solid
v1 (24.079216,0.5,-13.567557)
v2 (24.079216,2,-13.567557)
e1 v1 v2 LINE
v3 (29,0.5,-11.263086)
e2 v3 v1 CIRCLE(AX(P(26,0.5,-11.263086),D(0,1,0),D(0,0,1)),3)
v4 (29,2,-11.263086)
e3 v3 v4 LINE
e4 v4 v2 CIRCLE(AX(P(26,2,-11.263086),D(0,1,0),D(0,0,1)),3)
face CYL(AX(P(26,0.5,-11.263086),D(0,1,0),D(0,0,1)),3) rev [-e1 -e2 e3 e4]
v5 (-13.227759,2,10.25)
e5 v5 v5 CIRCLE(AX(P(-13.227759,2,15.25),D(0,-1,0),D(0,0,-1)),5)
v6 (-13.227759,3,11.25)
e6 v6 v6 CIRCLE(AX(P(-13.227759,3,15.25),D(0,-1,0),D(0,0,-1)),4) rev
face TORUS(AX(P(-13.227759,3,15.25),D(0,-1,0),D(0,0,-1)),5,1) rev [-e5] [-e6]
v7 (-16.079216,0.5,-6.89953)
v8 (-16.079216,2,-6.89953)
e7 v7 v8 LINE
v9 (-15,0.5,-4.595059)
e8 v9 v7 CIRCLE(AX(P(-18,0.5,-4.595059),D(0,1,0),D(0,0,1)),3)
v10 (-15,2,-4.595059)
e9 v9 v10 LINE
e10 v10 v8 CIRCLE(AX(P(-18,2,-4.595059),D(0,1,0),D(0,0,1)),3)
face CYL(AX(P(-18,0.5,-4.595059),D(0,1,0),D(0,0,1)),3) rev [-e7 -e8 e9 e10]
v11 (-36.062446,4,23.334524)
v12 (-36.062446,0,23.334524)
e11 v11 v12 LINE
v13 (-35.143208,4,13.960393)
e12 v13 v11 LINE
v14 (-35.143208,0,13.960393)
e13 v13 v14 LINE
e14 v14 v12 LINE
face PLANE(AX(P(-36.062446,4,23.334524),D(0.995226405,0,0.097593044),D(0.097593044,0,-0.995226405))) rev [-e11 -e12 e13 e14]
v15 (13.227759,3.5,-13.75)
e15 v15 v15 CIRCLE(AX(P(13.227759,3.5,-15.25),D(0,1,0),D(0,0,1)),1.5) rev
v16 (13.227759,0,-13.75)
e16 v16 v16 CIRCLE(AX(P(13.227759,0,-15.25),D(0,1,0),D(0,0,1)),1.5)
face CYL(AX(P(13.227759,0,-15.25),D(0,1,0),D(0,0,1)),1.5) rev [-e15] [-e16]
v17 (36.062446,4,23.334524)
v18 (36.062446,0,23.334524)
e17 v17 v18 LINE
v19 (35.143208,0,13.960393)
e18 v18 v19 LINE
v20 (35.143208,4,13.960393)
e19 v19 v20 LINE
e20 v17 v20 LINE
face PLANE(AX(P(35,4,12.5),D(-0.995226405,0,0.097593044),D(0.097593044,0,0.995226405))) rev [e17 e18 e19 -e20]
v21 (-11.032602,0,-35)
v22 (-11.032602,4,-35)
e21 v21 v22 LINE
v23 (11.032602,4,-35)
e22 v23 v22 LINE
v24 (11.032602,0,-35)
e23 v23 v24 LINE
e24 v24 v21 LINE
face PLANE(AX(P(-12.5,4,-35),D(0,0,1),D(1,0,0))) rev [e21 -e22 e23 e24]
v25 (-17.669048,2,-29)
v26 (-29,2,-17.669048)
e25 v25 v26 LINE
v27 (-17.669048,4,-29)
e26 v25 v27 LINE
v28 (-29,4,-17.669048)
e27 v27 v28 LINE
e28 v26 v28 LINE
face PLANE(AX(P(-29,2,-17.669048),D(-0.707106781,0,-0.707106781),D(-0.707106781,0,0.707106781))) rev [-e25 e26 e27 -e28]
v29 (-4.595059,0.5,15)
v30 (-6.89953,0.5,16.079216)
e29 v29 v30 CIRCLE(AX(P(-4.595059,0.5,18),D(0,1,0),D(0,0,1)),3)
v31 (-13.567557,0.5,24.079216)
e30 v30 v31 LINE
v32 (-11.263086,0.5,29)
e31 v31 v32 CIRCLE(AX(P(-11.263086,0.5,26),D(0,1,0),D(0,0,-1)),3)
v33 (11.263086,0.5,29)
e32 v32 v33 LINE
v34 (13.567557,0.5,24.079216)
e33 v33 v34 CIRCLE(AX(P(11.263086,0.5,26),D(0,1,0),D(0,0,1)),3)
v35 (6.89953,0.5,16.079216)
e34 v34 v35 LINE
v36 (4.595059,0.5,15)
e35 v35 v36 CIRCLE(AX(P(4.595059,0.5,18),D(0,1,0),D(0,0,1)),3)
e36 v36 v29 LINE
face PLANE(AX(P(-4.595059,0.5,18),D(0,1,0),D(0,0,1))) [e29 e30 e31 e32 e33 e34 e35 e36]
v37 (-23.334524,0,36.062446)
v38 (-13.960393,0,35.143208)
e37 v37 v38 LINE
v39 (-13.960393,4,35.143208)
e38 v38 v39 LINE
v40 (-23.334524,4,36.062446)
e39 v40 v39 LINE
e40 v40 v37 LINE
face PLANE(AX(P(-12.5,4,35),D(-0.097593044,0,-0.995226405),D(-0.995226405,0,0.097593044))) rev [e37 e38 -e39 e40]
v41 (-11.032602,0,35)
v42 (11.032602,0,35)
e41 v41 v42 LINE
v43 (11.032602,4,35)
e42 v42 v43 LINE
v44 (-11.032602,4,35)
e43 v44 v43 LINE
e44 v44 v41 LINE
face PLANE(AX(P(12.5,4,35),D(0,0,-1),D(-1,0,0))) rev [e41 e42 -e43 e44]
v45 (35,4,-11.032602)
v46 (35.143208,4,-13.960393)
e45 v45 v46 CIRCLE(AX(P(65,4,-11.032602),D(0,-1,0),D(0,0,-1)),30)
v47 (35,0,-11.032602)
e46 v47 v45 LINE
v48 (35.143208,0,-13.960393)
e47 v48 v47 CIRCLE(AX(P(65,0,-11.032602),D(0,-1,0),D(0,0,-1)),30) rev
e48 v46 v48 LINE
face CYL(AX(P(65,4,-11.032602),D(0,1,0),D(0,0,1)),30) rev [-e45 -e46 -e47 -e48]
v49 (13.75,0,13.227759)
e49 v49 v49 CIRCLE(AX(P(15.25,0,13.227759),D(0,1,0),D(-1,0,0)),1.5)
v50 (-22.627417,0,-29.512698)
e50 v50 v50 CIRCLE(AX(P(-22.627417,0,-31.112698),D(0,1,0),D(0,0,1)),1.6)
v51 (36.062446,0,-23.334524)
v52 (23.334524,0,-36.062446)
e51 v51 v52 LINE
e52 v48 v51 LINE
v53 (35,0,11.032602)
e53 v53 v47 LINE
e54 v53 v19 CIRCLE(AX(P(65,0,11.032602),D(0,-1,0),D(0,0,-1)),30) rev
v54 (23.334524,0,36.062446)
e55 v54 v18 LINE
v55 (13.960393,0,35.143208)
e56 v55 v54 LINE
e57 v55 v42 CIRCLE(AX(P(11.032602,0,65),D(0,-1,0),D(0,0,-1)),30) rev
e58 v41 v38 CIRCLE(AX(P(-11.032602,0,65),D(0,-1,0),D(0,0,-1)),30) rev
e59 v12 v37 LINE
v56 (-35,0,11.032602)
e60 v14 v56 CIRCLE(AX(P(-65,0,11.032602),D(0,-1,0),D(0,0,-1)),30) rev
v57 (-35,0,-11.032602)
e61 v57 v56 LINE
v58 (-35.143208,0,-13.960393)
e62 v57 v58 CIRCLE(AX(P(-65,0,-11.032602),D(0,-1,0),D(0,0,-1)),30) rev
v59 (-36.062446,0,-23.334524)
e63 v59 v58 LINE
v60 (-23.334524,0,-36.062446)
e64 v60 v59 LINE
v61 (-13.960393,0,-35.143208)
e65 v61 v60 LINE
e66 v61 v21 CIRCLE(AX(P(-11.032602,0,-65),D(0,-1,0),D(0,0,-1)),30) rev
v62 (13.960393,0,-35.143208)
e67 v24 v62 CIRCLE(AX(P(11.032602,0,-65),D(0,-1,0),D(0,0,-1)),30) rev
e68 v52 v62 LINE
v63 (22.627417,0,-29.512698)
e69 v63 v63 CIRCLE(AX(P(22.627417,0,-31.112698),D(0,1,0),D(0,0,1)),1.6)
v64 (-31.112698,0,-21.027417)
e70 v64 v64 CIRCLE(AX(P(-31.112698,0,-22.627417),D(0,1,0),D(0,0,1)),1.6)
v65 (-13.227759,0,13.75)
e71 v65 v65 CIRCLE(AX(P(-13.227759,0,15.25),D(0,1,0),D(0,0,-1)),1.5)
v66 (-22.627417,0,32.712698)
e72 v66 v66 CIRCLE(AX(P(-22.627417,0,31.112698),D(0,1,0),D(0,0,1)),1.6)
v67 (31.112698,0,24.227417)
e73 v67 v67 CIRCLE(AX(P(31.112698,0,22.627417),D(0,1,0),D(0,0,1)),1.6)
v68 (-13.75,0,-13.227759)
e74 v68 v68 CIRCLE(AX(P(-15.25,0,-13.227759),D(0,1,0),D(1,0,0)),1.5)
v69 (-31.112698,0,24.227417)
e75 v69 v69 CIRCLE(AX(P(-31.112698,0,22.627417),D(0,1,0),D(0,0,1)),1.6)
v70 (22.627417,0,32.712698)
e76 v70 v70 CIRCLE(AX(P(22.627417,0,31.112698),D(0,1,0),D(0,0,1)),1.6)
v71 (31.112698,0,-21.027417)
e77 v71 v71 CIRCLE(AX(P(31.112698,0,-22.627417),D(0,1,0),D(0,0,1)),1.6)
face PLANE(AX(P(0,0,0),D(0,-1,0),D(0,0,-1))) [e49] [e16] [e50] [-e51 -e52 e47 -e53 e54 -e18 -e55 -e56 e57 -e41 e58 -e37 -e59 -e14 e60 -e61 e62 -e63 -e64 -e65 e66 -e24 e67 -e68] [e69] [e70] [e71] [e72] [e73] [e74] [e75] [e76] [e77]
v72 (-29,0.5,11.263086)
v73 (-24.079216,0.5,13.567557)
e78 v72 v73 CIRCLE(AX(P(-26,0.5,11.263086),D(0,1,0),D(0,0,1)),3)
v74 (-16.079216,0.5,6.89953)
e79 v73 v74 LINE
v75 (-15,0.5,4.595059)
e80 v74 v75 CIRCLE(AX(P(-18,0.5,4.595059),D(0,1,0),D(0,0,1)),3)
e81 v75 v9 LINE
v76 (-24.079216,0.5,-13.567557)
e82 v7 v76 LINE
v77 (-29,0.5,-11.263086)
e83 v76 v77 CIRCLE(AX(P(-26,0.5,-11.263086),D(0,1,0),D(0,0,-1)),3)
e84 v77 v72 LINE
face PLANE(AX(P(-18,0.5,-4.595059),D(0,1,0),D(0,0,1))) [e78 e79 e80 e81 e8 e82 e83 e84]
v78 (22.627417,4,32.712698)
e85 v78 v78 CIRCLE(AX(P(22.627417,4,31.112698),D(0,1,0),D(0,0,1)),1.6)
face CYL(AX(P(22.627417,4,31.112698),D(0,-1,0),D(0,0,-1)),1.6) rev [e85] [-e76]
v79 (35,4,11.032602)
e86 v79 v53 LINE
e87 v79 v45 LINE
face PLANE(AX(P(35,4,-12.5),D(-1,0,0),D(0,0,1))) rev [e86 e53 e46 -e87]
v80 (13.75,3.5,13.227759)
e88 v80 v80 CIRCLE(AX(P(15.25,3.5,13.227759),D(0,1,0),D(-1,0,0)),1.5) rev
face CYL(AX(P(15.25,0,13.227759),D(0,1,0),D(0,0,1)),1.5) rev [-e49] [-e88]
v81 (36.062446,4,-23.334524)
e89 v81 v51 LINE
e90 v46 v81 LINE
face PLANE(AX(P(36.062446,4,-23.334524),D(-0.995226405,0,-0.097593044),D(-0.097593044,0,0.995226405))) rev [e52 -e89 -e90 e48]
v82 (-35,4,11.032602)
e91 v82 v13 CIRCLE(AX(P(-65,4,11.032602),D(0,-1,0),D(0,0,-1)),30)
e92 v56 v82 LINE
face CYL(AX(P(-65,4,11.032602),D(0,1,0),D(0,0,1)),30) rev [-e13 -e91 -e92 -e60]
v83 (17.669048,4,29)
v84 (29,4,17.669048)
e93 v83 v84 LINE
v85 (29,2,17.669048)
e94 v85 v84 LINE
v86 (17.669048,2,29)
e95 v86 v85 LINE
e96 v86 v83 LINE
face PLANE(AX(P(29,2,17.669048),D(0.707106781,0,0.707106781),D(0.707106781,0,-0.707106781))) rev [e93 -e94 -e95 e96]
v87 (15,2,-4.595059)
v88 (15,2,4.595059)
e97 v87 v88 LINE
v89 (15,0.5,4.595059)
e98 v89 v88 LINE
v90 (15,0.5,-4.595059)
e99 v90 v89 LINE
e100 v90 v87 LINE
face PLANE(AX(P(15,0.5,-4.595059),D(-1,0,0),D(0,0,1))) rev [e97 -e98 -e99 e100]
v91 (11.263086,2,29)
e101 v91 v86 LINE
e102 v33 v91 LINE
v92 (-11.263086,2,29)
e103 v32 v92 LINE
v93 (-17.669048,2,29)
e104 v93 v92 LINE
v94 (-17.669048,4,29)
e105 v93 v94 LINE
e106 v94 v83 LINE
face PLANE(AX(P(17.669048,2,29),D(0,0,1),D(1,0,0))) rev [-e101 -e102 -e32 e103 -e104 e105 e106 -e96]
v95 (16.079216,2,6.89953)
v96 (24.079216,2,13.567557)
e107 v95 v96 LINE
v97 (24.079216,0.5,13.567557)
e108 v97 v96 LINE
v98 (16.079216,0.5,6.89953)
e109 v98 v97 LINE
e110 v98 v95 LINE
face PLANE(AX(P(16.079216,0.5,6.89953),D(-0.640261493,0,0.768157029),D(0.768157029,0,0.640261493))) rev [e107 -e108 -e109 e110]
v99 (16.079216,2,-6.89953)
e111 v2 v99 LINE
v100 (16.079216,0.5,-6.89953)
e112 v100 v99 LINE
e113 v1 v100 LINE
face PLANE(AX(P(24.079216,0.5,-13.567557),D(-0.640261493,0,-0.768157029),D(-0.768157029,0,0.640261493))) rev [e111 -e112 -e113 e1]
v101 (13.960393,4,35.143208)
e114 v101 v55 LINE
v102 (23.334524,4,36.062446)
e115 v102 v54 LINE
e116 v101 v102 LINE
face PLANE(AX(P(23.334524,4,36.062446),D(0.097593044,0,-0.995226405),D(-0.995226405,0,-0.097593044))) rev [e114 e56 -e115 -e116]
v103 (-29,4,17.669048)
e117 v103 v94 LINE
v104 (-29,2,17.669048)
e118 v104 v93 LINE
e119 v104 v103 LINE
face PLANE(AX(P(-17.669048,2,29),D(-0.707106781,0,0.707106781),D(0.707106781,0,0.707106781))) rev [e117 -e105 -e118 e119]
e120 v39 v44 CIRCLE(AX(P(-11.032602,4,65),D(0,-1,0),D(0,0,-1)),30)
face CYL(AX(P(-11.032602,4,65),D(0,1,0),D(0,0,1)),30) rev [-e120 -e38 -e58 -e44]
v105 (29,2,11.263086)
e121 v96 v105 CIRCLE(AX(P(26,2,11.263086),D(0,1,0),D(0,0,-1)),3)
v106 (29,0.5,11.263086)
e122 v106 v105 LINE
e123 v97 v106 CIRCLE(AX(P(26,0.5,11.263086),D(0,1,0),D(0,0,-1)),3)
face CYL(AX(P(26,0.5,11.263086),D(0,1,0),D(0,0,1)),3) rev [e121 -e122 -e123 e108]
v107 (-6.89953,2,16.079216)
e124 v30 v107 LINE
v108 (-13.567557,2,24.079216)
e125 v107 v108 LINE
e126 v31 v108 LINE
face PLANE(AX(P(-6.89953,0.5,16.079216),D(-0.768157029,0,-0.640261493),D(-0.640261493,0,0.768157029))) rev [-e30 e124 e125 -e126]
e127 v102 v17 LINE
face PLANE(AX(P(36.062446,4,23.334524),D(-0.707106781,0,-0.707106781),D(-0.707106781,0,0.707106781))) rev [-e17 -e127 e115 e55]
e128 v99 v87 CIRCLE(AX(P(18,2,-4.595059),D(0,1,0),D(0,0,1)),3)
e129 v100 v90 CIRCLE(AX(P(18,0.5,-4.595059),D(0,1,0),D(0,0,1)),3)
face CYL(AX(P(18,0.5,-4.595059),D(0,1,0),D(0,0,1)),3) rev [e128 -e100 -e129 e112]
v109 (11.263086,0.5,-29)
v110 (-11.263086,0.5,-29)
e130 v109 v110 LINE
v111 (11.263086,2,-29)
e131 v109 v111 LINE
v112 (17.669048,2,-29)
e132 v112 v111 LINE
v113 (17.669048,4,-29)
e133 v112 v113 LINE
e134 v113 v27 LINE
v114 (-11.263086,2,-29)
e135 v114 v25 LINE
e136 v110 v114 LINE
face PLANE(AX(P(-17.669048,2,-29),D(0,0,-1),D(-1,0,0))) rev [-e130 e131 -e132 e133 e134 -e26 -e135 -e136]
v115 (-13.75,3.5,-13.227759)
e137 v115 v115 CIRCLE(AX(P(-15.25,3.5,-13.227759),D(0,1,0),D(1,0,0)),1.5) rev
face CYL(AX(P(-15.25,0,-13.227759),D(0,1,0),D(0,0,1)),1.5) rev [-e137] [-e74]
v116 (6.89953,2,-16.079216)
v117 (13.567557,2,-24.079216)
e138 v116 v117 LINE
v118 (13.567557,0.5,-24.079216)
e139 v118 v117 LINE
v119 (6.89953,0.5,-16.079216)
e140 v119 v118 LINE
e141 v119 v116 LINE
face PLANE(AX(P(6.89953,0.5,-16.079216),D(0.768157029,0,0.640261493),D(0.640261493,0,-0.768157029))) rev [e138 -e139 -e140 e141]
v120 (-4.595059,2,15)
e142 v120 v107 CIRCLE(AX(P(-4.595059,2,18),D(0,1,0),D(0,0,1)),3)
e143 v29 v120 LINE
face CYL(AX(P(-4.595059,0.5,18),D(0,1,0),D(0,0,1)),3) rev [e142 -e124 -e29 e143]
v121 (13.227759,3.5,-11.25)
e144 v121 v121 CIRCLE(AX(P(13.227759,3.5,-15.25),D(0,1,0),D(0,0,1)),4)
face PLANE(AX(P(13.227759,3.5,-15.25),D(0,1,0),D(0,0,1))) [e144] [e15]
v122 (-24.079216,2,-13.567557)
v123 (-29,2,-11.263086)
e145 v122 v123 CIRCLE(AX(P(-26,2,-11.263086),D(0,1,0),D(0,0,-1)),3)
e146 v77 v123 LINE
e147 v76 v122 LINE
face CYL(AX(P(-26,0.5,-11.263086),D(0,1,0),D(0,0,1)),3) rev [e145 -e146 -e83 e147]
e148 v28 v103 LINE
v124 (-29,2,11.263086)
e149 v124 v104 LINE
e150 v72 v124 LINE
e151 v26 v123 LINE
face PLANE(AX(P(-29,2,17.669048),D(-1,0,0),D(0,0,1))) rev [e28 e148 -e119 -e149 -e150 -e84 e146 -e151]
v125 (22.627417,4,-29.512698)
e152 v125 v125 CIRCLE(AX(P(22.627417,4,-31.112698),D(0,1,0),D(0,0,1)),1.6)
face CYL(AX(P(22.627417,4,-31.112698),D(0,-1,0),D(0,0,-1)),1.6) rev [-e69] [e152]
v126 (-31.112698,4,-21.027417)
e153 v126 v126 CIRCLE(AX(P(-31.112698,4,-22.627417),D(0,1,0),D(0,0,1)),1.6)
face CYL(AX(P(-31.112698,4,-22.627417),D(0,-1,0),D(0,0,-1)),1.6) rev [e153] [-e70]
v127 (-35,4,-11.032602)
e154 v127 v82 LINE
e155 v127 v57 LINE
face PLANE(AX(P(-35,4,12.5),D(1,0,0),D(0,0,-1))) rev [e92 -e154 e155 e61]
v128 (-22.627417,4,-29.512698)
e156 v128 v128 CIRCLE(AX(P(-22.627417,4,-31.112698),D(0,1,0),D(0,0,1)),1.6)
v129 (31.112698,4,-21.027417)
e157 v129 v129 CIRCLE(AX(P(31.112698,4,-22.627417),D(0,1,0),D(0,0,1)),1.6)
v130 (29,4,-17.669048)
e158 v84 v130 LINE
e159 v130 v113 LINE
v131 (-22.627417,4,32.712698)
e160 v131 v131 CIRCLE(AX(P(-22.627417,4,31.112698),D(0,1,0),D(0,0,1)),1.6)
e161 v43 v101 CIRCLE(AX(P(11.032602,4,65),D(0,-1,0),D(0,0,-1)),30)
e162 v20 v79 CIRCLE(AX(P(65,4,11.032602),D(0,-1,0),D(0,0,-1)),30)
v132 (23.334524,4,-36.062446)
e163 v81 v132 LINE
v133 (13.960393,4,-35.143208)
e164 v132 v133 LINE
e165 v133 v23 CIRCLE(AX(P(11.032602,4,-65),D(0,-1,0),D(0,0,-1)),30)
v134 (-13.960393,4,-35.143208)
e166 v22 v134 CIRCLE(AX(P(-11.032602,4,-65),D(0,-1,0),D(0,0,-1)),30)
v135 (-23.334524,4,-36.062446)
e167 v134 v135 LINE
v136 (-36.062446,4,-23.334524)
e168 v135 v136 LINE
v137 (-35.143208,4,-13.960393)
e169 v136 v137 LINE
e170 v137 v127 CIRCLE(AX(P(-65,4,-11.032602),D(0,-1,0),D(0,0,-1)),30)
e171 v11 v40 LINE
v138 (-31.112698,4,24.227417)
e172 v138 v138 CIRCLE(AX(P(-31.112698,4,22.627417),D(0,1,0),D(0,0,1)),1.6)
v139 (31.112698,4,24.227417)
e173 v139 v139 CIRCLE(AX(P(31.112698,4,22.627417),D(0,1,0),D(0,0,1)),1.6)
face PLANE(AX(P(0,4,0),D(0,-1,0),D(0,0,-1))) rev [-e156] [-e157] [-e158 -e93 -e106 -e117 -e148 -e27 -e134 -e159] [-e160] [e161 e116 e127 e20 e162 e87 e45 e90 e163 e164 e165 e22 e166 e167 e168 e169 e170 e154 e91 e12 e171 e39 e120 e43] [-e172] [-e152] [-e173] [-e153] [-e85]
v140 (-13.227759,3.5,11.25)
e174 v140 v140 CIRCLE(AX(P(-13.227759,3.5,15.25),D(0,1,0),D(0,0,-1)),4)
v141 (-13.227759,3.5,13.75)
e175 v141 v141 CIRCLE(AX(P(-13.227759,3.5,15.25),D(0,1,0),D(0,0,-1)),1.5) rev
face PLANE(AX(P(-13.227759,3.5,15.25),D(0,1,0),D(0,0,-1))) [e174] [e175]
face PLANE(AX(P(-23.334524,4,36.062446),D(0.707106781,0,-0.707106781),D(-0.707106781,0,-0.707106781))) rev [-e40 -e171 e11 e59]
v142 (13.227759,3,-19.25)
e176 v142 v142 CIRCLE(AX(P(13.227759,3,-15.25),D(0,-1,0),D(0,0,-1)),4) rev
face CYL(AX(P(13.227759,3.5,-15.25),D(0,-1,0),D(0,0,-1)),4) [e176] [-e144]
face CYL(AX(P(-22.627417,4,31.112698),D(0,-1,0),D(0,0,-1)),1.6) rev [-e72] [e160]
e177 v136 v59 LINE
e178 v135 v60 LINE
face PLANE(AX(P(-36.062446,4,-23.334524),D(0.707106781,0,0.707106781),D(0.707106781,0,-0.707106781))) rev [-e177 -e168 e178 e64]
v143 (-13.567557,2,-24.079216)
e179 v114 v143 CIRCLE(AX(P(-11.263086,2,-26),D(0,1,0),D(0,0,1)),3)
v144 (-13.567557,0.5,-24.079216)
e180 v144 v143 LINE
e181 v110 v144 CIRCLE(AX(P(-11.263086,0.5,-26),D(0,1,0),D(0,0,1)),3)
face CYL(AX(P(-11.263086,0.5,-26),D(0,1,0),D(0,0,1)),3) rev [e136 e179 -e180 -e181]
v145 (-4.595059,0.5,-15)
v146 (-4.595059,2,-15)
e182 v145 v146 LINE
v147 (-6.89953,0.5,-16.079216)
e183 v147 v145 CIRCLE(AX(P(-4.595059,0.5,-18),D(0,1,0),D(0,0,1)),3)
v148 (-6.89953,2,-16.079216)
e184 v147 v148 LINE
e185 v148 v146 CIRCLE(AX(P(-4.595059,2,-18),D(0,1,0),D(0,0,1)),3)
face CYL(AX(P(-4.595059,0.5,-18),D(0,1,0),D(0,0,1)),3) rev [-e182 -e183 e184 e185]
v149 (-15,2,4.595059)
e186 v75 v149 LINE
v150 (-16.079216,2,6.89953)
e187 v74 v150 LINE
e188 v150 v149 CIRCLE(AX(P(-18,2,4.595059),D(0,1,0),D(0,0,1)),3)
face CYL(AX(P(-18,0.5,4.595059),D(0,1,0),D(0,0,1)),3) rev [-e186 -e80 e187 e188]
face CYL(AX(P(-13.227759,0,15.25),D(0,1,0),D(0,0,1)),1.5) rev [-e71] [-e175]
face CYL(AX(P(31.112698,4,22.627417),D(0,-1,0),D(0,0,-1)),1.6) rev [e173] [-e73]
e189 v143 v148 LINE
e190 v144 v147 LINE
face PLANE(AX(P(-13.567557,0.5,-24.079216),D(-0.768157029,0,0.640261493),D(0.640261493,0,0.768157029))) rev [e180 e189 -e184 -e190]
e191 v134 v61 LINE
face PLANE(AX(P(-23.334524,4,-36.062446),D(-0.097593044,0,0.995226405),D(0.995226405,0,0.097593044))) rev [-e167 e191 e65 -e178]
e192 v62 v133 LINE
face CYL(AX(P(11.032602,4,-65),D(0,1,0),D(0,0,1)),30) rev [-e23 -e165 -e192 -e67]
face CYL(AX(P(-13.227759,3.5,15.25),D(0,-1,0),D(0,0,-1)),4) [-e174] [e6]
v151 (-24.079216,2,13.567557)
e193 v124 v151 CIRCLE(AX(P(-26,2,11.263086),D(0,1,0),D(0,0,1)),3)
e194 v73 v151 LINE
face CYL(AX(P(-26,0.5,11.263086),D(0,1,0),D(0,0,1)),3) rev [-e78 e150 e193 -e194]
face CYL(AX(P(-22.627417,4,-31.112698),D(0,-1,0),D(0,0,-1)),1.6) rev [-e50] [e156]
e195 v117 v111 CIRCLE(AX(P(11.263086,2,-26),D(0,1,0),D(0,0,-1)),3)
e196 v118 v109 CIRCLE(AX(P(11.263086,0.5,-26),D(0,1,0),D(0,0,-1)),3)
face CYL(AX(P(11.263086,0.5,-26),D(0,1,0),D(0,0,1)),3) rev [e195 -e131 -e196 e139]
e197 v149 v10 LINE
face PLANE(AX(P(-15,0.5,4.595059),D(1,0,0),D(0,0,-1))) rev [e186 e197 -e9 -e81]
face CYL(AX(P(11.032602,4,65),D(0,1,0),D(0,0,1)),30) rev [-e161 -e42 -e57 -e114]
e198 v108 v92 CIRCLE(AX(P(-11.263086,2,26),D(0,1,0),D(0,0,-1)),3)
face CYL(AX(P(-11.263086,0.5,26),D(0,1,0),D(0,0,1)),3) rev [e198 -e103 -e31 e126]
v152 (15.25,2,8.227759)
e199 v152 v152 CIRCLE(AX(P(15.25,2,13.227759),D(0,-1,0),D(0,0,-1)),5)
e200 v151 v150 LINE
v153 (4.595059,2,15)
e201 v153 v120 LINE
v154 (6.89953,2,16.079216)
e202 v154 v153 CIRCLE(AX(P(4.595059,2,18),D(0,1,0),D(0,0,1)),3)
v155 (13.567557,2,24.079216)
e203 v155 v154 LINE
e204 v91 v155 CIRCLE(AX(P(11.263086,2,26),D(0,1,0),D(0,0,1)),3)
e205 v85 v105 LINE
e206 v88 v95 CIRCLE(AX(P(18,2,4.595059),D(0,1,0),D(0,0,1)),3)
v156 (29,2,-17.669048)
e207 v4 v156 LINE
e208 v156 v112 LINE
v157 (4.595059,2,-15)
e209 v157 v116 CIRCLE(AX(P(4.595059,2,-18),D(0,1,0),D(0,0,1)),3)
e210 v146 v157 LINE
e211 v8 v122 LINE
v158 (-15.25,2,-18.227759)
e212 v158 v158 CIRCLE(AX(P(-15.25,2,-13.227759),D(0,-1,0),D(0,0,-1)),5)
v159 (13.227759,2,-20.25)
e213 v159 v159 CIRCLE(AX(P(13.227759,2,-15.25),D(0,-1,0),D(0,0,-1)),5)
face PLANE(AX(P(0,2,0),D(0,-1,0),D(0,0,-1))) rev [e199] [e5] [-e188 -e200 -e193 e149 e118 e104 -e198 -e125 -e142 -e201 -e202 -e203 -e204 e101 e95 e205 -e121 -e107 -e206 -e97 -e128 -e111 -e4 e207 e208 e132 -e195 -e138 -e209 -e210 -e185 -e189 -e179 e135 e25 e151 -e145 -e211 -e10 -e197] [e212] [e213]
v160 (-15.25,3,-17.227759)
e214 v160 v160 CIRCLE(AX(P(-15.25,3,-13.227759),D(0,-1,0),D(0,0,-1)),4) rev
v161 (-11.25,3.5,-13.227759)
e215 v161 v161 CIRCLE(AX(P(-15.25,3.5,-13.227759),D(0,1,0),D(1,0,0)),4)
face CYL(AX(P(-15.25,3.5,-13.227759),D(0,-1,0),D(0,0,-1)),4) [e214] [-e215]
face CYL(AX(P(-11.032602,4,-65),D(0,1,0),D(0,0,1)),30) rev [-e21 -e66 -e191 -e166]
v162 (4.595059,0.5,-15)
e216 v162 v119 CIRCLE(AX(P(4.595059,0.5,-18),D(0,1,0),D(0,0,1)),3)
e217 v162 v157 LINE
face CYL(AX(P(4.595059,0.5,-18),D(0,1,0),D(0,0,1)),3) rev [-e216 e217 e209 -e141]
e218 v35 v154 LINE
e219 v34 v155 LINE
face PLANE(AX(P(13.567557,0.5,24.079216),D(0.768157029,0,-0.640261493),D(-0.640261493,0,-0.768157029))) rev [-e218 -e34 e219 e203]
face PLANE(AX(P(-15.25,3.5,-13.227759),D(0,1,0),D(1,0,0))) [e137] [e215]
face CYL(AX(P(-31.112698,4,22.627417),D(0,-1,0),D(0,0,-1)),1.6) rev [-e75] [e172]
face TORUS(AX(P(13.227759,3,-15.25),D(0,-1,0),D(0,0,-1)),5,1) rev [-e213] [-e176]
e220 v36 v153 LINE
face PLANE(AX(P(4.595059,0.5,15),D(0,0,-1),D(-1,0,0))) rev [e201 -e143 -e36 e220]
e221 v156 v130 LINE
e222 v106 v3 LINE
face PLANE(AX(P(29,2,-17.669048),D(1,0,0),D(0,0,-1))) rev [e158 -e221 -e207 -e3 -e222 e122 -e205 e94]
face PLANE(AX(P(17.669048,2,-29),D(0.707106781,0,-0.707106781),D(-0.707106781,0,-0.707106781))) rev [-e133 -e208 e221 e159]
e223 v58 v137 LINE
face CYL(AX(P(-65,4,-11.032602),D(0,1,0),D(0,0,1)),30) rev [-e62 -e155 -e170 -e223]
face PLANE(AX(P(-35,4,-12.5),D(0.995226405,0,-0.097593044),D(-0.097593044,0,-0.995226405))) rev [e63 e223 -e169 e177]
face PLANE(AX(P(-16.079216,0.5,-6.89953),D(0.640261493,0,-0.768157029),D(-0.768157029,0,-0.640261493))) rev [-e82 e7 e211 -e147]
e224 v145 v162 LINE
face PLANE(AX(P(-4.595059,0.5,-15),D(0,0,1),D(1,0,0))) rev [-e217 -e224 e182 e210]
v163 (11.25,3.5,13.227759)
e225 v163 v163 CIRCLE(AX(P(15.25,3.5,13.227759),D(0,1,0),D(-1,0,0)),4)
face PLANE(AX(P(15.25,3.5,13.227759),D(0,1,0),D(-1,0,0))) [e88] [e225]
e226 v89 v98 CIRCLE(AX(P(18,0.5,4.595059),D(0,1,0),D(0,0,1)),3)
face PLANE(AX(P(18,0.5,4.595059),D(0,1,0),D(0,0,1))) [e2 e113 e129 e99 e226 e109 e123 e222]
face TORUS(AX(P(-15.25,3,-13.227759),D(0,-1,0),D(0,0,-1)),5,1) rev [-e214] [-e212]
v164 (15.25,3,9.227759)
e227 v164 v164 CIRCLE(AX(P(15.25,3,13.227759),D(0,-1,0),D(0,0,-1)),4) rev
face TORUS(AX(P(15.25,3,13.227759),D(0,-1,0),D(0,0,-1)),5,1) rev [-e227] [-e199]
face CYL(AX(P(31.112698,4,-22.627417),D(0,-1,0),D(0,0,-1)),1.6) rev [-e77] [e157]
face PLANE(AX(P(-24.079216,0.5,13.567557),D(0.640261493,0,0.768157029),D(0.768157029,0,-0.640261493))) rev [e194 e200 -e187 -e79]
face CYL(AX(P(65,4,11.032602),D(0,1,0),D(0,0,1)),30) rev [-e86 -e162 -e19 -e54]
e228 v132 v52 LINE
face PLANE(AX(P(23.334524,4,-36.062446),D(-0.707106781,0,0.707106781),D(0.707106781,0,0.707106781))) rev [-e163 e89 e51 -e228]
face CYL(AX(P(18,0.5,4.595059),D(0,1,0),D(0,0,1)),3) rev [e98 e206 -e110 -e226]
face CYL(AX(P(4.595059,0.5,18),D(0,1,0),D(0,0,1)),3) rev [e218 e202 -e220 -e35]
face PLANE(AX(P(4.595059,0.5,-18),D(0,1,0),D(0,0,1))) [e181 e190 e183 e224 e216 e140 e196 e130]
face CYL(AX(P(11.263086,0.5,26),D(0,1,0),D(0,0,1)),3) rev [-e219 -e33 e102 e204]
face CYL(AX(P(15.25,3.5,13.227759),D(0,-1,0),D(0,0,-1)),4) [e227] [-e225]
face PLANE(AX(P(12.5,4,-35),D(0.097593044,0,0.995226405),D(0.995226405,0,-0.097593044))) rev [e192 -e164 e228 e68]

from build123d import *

# Parameters (mm, degrees)
SKETCH2_R           = 1.6
BOSS_EXTRUDE1_DEPTH = 4
CUT_EXTRUDE1_DEPTH  = 2
CUT_EXTRUDE2_DEPTH  = 1.5
SKETCH5_R           = 1.5
CUT_EXTRUDE3_DEPTH  = 52.039200621
BOSS_EXTRUDE2_START = 1.5
SKETCH6_R           = 4
SKETCH6_R_2         = 1.5
BOSS_EXTRUDE2_DEPTH = 1.5
CIRPATTERN1_COUNT   = 4
FILLET1_R           = 1
FILLET2_R           = 30


with BuildPart() as part:
    # Sketch2 → Boss-Extrude1 (new body)
    with BuildSketch(Plane(origin=(0, 0, 0), x_dir=(1, 0, 0), z_dir=(0, 1, 0))):
        Polygon((-12.5, 35), (12.5, 35), (23.334523779, 36.062445841), (36.062445841, 23.334523779), (35, 12.5), (35, -12.5), (36.062445841, -23.334523779), (23.334523779, -36.062445841), (12.5, -35), (-12.5, -35), (-23.334523779, -36.062445841), (-36.062445841, -23.334523779), (-35, -12.5), (-35, 12.5), (-36.062445841, 23.334523779), (-23.334523779, 36.062445841), align=None)
        with Locations(Location((22.627416998, 31.112698372, 0), (0, 0, 270))):
            Circle(SKETCH2_R, mode=Mode.SUBTRACT)
        with Locations(Location((31.112698372, 22.627416998, 0), (0, 0, 270))):
            Circle(SKETCH2_R, mode=Mode.SUBTRACT)
        with Locations(Location((22.627416998, -31.112698372, 0), (0, 0, 270))):
            Circle(SKETCH2_R, mode=Mode.SUBTRACT)
        with Locations(Location((31.112698372, -22.627416998, 0), (0, 0, 270))):
            Circle(SKETCH2_R, mode=Mode.SUBTRACT)
        with Locations(Location((-31.112698372, -22.627416998, 0), (0, 0, 270))):
            Circle(SKETCH2_R, mode=Mode.SUBTRACT)
        with Locations(Location((-22.627416998, -31.112698372, 0), (0, 0, 270))):
            Circle(SKETCH2_R, mode=Mode.SUBTRACT)
        with Locations(Location((-22.627416998, 31.112698372, 0), (0, 0, 270))):
            Circle(SKETCH2_R, mode=Mode.SUBTRACT)
        with Locations(Location((-31.112698372, 22.627416998, 0), (0, 0, 270))):
            Circle(SKETCH2_R, mode=Mode.SUBTRACT)
    extrude(amount=BOSS_EXTRUDE1_DEPTH)

    # Sketch3 → Cut-Extrude1 (cut)
    with BuildSketch(Plane(origin=(0, 4, 0), x_dir=(1, 0, 0), z_dir=(0, 1, 0))):
        Polygon((-17.669047558, 29), (17.669047558, 29), (29, 17.669047558), (29, -17.669047558), (17.669047558, -29), (-17.669047558, -29), (-29, -17.669047558), (-29, 17.669047558), align=None)
    extrude(amount=-CUT_EXTRUDE1_DEPTH, mode=Mode.SUBTRACT)

    # Sketch4 → Cut-Extrude2 (cut)
    with BuildSketch(Plane(origin=(0, 2, 0), x_dir=(1, 0, 0), z_dir=(0, 1, 0))):
        with BuildLine():
            Line((-29, 11.263085893), (-29, -11.263085893))
            ThreePointArc((-29, -11.263085893), (-27.272329864, -13.979918004), (-24.079215521, -13.567556979))
            Line((-24.079215521, -13.567556979), (-16.079215521, -6.899529803))
            ThreePointArc((-16.079215521, -6.899529803), (-15.283167889, -5.867388581), (-15, -4.595058717))
            Line((-15, -4.595058717), (-15, 4.595058717))
            ThreePointArc((-15, 4.595058717), (-15.283167889, 5.867388581), (-16.079215521, 6.899529803))
            Line((-16.079215521, 6.899529803), (-24.079215521, 13.567556979))
            ThreePointArc((-24.079215521, 13.567556979), (-27.272329864, 13.979918004), (-29, 11.263085893))
        make_face()
        with BuildLine():
            Line((11.263085893, 29), (-11.263085893, 29))
            ThreePointArc((-11.263085893, 29), (-13.979918004, 27.272329864), (-13.567556979, 24.079215521))
            Line((-13.567556979, 24.079215521), (-6.899529803, 16.079215521))
            ThreePointArc((-6.899529803, 16.079215521), (-5.867388581, 15.283167889), (-4.595058717, 15))
            Line((-4.595058717, 15), (4.595058717, 15))
            ThreePointArc((4.595058717, 15), (5.867388581, 15.283167889), (6.899529803, 16.079215521))
            Line((6.899529803, 16.079215521), (13.567556979, 24.079215521))
            ThreePointArc((13.567556979, 24.079215521), (13.979918004, 27.272329864), (11.263085893, 29))
        make_face()
        with BuildLine():
            Line((29, -11.263085893), (29, 11.263085893))
            ThreePointArc((29, 11.263085893), (27.272329864, 13.979918004), (24.079215521, 13.567556979))
            Line((24.079215521, 13.567556979), (16.079215521, 6.899529803))
            ThreePointArc((16.079215521, 6.899529803), (15.283167889, 5.867388581), (15, 4.595058717))
            Line((15, 4.595058717), (15, -4.595058717))
            ThreePointArc((15, -4.595058717), (15.283167889, -5.867388581), (16.079215521, -6.899529803))
            Line((16.079215521, -6.899529803), (24.079215521, -13.567556979))
            ThreePointArc((24.079215521, -13.567556979), (27.272329864, -13.979918004), (29, -11.263085893))
        make_face()
        with BuildLine():
            Line((-11.263085893, -29), (11.263085893, -29))
            ThreePointArc((11.263085893, -29), (13.979918004, -27.272329864), (13.567556979, -24.079215521))
            Line((13.567556979, -24.079215521), (6.899529803, -16.079215521))
            ThreePointArc((6.899529803, -16.079215521), (5.867388581, -15.283167889), (4.595058717, -15))
            Line((4.595058717, -15), (-4.595058717, -15))
            ThreePointArc((-4.595058717, -15), (-5.867388581, -15.283167889), (-6.899529803, -16.079215521))
            Line((-6.899529803, -16.079215521), (-13.567556979, -24.079215521))
            ThreePointArc((-13.567556979, -24.079215521), (-13.979918004, -27.272329864), (-11.263085893, -29))
        make_face()
    extrude(amount=-CUT_EXTRUDE2_DEPTH, mode=Mode.SUBTRACT)

    # Sketch5 → Cut-Extrude3 (cut, through all)
    with BuildSketch(Plane(origin=(0, 2, 0), x_dir=(1, 0, 0), z_dir=(0, 1, 0))):
        with Locations(Location((13.22775948, 15.25, 0), (0, 0, 270))):
            Circle(SKETCH5_R)
    cut_extrude3 = extrude(amount=-CUT_EXTRUDE3_DEPTH, mode=Mode.SUBTRACT)

    # Sketch6 → Boss-Extrude2 (add)
    with BuildSketch(Plane(origin=(0, 2, 0), x_dir=(1, 0, 0), z_dir=(0, 1, 0)).offset(BOSS_EXTRUDE2_START)):
        with Locations(Location((13.22775948, 15.25, 0), (0, 0, 90))):
            Circle(SKETCH6_R)
        with Locations(Location((13.22775948, 15.25, 0), (0, 0, 270))):
            Circle(SKETCH6_R_2, mode=Mode.SUBTRACT)
    boss_extrude2 = extrude(amount=-BOSS_EXTRUDE2_DEPTH)

    # CirPattern1: Cut-Extrude3, Boss-Extrude2 ×4 about axis
    cirpattern1_axis = Axis((0, 0, 0), (0, 1, 0))
    add([cut_extrude3.rotate(cirpattern1_axis, i * 360 / CIRPATTERN1_COUNT) for i in range(1, CIRPATTERN1_COUNT)], mode=Mode.SUBTRACT)
    add([boss_extrude2.rotate(cirpattern1_axis, i * 360 / CIRPATTERN1_COUNT) for i in range(1, CIRPATTERN1_COUNT)])

    # Fillet1
    fillet1_edges = [part.edges().sort_by_distance(p)[0] for p in [
        (13.22775948, 2, -11.25),
        (-11.25, 2, -13.22775948),
        (-13.22775948, 2, 11.25),
        (11.25, 2, 13.22775948),
    ]]
    fillet(fillet1_edges, radius=FILLET1_R)

    # Fillet2
    # the kernel refuses this fillet: 30 mm, written as the material it adds along each edge
    with BuildSketch(Plane(origin=(-12.5, 0, -35), x_dir=(1, 0, 0), z_dir=(0, 1, 0)), Plane(origin=(-12.5, 0, 35), x_dir=(-0.9952264052892463, 0, 0.09759304388656388), z_dir=(0, 1, 0)), Plane(origin=(-35, 0, 12.5), x_dir=(0, 0, -1), z_dir=(0, 1, 0)), Plane(origin=(-35, 0, -12.5), x_dir=(-0.09759304388655968, 0, -0.9952264052892468), z_dir=(0, 1, 0))) as fillet2_piece_1:
        with BuildLine():
            CenterArc((FILLET2_R * 0.0489132680018, FILLET2_R), FILLET2_R, 264.399415997, 5.600584003)
            Line((-FILLET2_R * 0.0486797758844, FILLET2_R * 0.00477359471072), (0, 0))
            Line((0, 0), (FILLET2_R * 0.0489132680018, 0))
        make_face()
    extrude(amount=4)
    with BuildSketch(Plane(origin=(12.5, 0, -35), x_dir=(-1, 0, 0), z_dir=(0, 1, 0)), Plane(origin=(35, 0, -12.5), x_dir=(0.09759304388620155, 0, -0.9952264052892819), z_dir=(0, 1, 0)), Plane(origin=(35, 0, 12.5), x_dir=(0, 0, -1), z_dir=(0, 1, 0)), Plane(origin=(12.5, 0, 35), x_dir=(0.9952264052892817, 0, 0.09759304388620309), z_dir=(0, 1, 0))) as fillet2_piece_2:
        with BuildLine():
            CenterArc((FILLET2_R * 0.048913268002, -FILLET2_R), FILLET2_R, 90, 5.600584003)
            Line((-FILLET2_R * 0.0486797758846, -FILLET2_R * 0.00477359471075), (0, 0))
            Line((0, 0), (FILLET2_R * 0.048913268002, 0))
        make_face()
    extrude(amount=4)


solid = part.part
